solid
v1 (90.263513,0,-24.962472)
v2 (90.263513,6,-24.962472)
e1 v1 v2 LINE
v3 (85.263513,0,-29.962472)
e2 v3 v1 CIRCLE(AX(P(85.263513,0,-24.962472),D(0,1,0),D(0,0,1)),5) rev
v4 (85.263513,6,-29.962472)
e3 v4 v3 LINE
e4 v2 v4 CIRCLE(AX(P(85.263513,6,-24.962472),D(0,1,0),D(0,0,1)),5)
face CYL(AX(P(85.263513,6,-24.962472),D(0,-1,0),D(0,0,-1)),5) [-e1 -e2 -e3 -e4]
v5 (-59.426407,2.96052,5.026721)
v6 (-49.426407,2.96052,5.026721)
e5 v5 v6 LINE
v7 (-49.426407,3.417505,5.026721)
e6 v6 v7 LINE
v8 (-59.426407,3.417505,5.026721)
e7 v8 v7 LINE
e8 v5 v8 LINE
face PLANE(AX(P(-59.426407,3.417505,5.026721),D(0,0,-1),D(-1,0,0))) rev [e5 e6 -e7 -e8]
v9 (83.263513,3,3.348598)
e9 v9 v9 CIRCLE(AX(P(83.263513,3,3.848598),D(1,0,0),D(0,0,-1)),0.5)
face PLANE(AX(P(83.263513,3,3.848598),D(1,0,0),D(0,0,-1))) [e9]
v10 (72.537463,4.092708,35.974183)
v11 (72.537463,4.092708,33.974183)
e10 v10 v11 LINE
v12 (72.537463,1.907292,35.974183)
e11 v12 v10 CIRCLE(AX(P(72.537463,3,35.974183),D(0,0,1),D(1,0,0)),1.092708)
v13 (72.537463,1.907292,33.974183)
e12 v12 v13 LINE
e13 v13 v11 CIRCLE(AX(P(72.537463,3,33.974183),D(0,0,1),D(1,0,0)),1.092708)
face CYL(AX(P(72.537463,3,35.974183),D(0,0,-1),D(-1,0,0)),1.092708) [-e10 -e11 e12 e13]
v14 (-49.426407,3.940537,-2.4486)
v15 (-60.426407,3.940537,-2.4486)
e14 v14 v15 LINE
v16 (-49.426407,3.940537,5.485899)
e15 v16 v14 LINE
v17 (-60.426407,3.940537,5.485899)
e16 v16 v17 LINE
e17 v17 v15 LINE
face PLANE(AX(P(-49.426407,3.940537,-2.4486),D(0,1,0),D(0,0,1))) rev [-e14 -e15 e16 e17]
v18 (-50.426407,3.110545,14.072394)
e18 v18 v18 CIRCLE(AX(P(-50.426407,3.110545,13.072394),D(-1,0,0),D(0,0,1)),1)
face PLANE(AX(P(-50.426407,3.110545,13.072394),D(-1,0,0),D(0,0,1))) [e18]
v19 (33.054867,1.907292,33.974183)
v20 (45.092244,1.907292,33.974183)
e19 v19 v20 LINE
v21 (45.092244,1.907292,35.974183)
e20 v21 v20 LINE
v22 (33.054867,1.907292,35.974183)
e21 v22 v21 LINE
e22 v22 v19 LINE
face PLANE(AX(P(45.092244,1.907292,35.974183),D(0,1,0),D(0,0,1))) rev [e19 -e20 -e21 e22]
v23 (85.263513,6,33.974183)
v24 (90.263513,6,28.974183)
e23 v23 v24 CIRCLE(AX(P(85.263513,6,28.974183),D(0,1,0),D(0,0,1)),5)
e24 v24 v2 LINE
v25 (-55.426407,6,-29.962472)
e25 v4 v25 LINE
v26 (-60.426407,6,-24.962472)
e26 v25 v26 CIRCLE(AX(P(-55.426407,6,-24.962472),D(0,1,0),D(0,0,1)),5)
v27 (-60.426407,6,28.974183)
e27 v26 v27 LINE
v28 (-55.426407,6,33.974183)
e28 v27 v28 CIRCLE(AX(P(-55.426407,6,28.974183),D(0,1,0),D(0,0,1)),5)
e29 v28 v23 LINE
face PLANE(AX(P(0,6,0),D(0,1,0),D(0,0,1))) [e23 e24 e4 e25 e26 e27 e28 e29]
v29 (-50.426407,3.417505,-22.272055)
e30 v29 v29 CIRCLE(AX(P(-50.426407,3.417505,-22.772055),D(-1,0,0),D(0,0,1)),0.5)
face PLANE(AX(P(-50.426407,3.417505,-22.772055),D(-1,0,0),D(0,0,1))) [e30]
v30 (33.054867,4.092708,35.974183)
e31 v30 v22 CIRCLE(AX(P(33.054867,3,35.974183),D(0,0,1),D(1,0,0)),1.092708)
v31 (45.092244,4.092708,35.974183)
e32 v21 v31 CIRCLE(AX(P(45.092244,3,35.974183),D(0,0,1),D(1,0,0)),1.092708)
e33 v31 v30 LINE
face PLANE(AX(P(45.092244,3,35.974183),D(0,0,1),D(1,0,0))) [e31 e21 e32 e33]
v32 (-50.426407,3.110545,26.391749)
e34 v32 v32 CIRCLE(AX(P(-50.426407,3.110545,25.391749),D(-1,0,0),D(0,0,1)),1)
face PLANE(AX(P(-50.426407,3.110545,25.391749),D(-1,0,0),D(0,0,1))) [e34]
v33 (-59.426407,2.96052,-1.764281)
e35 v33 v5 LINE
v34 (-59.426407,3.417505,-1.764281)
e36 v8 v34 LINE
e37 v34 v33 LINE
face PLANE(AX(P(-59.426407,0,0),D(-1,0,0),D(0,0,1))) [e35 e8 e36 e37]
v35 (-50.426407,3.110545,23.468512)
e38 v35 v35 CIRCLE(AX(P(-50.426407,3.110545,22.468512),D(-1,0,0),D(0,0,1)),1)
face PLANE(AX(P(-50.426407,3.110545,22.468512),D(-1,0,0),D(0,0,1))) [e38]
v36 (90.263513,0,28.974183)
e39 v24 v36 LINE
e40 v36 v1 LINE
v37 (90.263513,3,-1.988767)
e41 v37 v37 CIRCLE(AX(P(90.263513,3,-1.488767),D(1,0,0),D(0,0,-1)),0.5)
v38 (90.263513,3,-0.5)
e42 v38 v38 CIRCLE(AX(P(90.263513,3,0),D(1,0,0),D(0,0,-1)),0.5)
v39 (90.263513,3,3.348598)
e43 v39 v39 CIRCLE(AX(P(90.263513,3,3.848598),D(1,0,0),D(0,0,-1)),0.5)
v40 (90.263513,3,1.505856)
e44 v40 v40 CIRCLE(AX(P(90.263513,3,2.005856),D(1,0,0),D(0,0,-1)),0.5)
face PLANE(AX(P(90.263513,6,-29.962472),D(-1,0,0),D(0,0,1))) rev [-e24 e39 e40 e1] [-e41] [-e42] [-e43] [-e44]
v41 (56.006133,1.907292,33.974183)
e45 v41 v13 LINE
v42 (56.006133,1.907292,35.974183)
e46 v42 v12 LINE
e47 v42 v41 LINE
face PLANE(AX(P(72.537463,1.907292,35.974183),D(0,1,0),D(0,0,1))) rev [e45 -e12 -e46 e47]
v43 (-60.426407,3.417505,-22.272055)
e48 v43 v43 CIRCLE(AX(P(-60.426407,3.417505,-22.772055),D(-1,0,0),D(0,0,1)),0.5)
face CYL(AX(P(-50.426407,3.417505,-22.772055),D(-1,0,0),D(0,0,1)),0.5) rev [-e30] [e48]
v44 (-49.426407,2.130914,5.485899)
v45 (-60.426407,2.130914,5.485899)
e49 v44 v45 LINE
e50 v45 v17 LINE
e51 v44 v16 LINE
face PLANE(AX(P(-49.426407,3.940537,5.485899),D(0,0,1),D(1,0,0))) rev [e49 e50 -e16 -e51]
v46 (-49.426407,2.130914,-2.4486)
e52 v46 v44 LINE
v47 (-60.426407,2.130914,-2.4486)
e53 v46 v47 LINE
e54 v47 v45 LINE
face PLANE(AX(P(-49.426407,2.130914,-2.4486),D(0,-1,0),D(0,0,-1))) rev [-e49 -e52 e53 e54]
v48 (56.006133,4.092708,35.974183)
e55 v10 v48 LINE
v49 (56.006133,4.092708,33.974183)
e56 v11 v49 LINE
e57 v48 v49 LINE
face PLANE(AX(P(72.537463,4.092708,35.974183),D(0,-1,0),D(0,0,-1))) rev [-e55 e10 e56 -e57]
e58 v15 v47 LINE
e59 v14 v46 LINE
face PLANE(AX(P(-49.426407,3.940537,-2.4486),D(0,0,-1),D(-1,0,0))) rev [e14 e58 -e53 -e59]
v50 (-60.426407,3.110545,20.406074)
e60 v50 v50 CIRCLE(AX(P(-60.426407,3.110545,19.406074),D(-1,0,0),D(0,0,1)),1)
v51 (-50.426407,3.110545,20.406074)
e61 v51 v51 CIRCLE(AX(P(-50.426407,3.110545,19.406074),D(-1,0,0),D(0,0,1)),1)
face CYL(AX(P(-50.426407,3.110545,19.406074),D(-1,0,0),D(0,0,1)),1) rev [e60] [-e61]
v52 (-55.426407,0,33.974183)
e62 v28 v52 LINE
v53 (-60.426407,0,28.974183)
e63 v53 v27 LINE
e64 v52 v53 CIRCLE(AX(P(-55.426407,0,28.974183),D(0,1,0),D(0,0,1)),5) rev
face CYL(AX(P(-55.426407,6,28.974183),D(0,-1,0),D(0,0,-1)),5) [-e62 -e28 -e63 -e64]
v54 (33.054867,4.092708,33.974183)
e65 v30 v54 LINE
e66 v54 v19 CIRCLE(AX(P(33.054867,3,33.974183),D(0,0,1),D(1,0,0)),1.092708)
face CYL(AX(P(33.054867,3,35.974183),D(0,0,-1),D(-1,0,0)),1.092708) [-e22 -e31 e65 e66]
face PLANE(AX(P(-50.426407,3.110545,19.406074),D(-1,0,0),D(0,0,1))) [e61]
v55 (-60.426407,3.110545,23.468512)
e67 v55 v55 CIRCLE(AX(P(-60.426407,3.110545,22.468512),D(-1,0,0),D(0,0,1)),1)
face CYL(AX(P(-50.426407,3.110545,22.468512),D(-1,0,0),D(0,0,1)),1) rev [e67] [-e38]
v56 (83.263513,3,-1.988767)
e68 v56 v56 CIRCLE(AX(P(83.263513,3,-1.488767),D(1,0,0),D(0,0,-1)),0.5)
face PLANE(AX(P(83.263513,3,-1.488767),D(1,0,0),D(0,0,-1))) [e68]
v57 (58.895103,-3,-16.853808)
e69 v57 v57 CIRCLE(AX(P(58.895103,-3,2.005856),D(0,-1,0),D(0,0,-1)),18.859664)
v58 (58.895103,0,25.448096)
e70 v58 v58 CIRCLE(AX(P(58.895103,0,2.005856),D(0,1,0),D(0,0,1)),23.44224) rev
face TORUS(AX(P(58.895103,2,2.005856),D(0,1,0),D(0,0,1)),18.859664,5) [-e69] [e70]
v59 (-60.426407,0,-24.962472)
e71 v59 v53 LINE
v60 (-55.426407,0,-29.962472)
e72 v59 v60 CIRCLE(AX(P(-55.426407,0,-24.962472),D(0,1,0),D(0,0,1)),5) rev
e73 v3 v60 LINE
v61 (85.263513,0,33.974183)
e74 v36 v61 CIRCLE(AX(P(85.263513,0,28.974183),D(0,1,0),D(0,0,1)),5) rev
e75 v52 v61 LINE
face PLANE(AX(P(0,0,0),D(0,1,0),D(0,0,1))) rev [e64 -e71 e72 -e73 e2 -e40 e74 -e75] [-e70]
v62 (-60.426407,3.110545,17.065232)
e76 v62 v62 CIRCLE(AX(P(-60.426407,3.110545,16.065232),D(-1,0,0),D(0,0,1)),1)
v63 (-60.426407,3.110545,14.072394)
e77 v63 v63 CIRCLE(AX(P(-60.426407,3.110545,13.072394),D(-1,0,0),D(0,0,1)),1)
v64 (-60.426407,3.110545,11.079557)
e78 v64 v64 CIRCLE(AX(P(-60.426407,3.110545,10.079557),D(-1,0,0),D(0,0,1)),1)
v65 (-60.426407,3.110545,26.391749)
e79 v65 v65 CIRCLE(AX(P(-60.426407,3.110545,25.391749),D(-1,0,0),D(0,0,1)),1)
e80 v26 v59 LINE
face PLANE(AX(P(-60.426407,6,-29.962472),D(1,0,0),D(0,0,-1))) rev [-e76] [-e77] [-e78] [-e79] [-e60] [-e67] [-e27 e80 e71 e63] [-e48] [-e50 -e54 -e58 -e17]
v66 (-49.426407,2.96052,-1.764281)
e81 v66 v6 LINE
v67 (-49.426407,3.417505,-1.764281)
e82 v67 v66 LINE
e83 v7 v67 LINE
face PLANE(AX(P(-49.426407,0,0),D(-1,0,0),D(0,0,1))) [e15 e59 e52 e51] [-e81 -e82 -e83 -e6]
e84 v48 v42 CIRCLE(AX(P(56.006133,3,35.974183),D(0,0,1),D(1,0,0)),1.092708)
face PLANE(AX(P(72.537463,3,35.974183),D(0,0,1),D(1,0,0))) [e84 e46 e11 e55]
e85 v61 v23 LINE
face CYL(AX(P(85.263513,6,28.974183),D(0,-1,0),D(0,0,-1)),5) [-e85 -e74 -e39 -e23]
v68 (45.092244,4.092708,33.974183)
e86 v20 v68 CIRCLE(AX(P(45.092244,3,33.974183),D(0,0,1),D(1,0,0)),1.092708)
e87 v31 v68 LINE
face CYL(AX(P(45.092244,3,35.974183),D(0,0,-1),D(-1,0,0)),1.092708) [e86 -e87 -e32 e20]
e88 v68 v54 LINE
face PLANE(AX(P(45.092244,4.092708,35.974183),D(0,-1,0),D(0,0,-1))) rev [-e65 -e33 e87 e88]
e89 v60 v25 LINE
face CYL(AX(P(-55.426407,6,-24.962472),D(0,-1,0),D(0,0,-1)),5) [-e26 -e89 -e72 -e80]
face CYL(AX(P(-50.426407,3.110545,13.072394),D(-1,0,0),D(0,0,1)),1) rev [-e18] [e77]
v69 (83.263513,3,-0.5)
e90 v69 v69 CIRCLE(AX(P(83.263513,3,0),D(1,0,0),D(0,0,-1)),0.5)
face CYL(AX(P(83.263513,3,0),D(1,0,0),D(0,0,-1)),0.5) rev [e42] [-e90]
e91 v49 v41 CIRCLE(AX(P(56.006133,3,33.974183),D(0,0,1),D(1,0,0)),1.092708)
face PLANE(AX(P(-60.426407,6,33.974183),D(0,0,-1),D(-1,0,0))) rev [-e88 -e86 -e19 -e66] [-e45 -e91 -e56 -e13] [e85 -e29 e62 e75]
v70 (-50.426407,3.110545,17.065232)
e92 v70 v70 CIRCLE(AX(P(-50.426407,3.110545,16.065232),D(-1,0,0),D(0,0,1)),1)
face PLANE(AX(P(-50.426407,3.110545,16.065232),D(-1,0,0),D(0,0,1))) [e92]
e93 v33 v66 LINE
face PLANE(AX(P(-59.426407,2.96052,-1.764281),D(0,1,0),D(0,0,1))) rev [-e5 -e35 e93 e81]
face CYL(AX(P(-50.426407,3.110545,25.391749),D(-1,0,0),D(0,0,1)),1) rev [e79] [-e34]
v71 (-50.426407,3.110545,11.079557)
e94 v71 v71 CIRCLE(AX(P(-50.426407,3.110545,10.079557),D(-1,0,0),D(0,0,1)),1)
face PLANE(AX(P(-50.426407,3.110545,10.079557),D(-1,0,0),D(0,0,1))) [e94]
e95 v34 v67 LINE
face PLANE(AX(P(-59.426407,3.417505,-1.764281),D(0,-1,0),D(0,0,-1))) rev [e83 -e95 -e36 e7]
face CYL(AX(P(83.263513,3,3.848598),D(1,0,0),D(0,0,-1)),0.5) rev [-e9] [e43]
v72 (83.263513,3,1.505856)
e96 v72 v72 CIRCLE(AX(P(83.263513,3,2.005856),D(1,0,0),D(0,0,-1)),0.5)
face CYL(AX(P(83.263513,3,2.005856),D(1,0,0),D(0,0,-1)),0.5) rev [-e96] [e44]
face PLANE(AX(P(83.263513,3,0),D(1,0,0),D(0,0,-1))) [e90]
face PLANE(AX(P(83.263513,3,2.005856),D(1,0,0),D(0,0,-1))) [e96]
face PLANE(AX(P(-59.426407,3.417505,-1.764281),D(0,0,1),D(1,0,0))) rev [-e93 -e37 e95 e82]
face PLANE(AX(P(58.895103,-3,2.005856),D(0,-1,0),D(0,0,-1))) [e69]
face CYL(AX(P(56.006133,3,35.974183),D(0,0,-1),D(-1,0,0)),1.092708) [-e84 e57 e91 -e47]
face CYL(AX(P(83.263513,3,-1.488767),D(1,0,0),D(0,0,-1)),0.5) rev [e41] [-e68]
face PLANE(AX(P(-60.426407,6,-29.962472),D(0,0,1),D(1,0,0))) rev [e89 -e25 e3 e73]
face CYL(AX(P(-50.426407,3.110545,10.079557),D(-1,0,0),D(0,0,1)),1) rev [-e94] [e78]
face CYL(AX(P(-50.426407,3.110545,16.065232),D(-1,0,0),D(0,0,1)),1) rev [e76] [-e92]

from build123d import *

# Parameters (mm, degrees)
SKETCH_1_W          = 150.689919998
SKETCH_1_H          = 63.936654908
EXTRUDE_1_DEPTH     = 6
FILLET_6_R          = 5
FILLET_7_R          = 5
FILLET_8_R          = 5
FILLET_9_R          = 5
SKETCH_2_W          = 7.93449938
SKETCH_2_H          = 1.809622666
CUT_EXTRUDE_1_DEPTH = 11
SKETCH_3_W          = 6.791001318
SKETCH_3_H          = 0.456984439
EXTRUDE_4_DEPTH     = 10
SKETCH_4_R          = 1
CUT_EXTRUDE_2_DEPTH = 10
SKETCH_7_R          = 0.626407846
EXTRUDE_5_DEPTH     = 5.887149494
SKETCH_11_R         = 0.5
CUT_EXTRUDE_4_DEPTH = 10
SKETCH_12_R         = 23.442239877
EXTRUDE_6_DEPTH     = 3
FILLET_11_R         = 5
EXTRUDE_7_DEPTH     = 2
SKETCH_16_R         = 0.5
CUT_EXTRUDE_5_DEPTH = 7


with BuildPart() as part:
    # 草图1 → 凸台-拉伸1 (new body)
    with BuildSketch(Plane(origin=(0, 0, 0), x_dir=(1, 0, 0), z_dir=(0, 1, 0))):
        with Locations((14.918552812, -2.00585584)):
            Rectangle(SKETCH_1_W, SKETCH_1_H)
    extrude(amount=EXTRUDE_1_DEPTH)

    # 圆角6
    fillet_6_edges = [part.edges().sort_by_distance(p)[0] for p in [
        (90.263512811, 3, -29.962471614),
    ]]
    fillet(fillet_6_edges, radius=FILLET_6_R)

    # 圆角7
    fillet_7_edges = [part.edges().sort_by_distance(p)[0] for p in [
        (90.263512811, 3, 33.974183294),
    ]]
    fillet(fillet_7_edges, radius=FILLET_7_R)

    # 圆角8
    fillet_8_edges = [part.edges().sort_by_distance(p)[0] for p in [
        (-60.426407187, 3, 33.974183294),
    ]]
    fillet(fillet_8_edges, radius=FILLET_8_R)

    # 圆角9
    fillet_9_edges = [part.edges().sort_by_distance(p)[0] for p in [
        (-60.426407187, 3, -29.962471614),
    ]]
    fillet(fillet_9_edges, radius=FILLET_9_R)

    # 草图2 → 切除-拉伸1 (cut)
    with BuildSketch(Plane.ZY.offset(60.426407187)):
        with Locations((1.518649738, 3.03572559)):
            Rectangle(SKETCH_2_W, SKETCH_2_H)
    extrude(amount=-CUT_EXTRUDE_1_DEPTH, mode=Mode.SUBTRACT)

    # 草图3 → 凸台-拉伸4 (add)
    with BuildSketch(Plane.ZY.offset(49.426407187)):
        with Locations((1.631220099, 3.18901263)):
            Rectangle(SKETCH_3_W, SKETCH_3_H)
    extrude(amount=EXTRUDE_4_DEPTH)

    # 草图4 → 切除-拉伸2 (cut)
    with BuildSketch(Plane.ZY.offset(60.426407187)):
        with Locations((13.072394448, 3.110545162)):
            Circle(SKETCH_4_R)
        with Locations((16.065231934, 3.110545162)):
            Circle(SKETCH_4_R)
        with Locations((19.406073778, 3.110545162)):
            Circle(SKETCH_4_R)
        with Locations((22.468512134, 3.110545162)):
            Circle(SKETCH_4_R)
        with Locations((10.079556963, 3.110545162)):
            Circle(SKETCH_4_R)
        with Locations((25.391748748, 3.110545162)):
            Circle(SKETCH_4_R)
    extrude(amount=-CUT_EXTRUDE_2_DEPTH, mode=Mode.SUBTRACT)

    # 草图7 → 凸台-拉伸5 (add)
    with BuildSketch(Plane.ZY.offset(50.426407187)):
        with BuildLine():
            Line((-21.86724317, 4.160702093), (-5.58063918, 4.160702093))
            ThreePointArc((-5.58063918, 4.160702093), (-4.53048225, 3.110545162), (-5.58063918, 2.060388231))
            Line((-5.58063918, 2.060388231), (-21.86724317, 2.060388231))
            ThreePointArc((-21.86724317, 2.060388231), (-22.9174001, 3.110545162), (-21.86724317, 4.160702093))
        make_face()
        with Locations((-21.86724317, 3.110545162)):
            Circle(SKETCH_7_R, mode=Mode.SUBTRACT)
    extrude(amount=EXTRUDE_5_DEPTH)

    # 草图11 → 切除-拉伸4 (cut)
    with BuildSketch(Plane.ZY.offset(60.426407187)):
        with Locations((-22.772054502, 3.417504849)):
            Circle(SKETCH_11_R)
    extrude(amount=-CUT_EXTRUDE_4_DEPTH, mode=Mode.SUBTRACT)

    # 草图12 → 凸台-拉伸6 (add)
    with BuildSketch(Plane.XZ):
        with Locations(Location((58.895102962, 2.00585584, 0), (0, 0, 90))):
            Circle(SKETCH_12_R)
    extrude(amount=EXTRUDE_6_DEPTH)

    # 圆角11
    # the kernel refuses this fillet: 5 mm, written as the material it takes off along each edge
    with BuildSketch(Plane(origin=(58.895102962, -3, 2.00585584), x_dir=(0, 0, 1), z_dir=(1, 0, 0))) as fillet_11_piece_1:
        with BuildLine():
            CenterArc((18.859664182, -5), FILLET_11_R, 23.578178478, 66.421821522)
            Line((18.859664182, 0), (18.859664182, 0.1))
            Line((18.859664182, 0.1), (23.442239877, 0.1))
            Line((23.442239877, 0.1), (23.542239877, 0))
            ThreePointArc((23.542239877, 0), (23.542239877, -1.5), (23.533891391, -2.96))
            Line((23.533891391, -2.96), (23.442239877, -3))
        make_face()
    revolve(axis=Axis((58.895102962, -3, 2.00585584), (0, -1, 0)), mode=Mode.SUBTRACT)

    # 草图15 → 凸台-拉伸7 (add)
    with BuildSketch(Plane.XY.offset(33.974183294)):
        with BuildLine():
            Line((72.53746341, 1.907291866), (56.006132514, 1.907291866))
            ThreePointArc((56.006132514, 1.907291866), (54.91342438, 3), (56.006132514, 4.092708134))
            Line((56.006132514, 4.092708134), (72.53746341, 4.092708134))
            ThreePointArc((72.53746341, 4.092708134), (73.630171544, 3), (72.53746341, 1.907291866))
        make_face()
        with BuildLine():
            Line((45.092244156, 1.907291866), (33.05486729, 1.907291866))
            ThreePointArc((33.05486729, 1.907291866), (31.962159155, 3), (33.05486729, 4.092708134))
            Line((33.05486729, 4.092708134), (45.092244156, 4.092708134))
            ThreePointArc((45.092244156, 4.092708134), (46.18495229, 3), (45.092244156, 1.907291866))
        make_face()
    extrude(amount=EXTRUDE_7_DEPTH)

    # 草图16 → 切除-拉伸5 (cut)
    with BuildSketch(Plane(origin=(90.263512811, 0, 0), x_dir=(0, 0, -1), z_dir=(1, 0, 0))):
        with Locations((0, 3)):
            Circle(SKETCH_16_R)
        with Locations((1.488767231, 3)):
            Circle(SKETCH_16_R)
        with Locations((-2.00585584, 3)):
            Circle(SKETCH_16_R)
        with Locations((-3.848597666, 3)):
            Circle(SKETCH_16_R)
    extrude(amount=-CUT_EXTRUDE_5_DEPTH, mode=Mode.SUBTRACT)


solid = part.part
